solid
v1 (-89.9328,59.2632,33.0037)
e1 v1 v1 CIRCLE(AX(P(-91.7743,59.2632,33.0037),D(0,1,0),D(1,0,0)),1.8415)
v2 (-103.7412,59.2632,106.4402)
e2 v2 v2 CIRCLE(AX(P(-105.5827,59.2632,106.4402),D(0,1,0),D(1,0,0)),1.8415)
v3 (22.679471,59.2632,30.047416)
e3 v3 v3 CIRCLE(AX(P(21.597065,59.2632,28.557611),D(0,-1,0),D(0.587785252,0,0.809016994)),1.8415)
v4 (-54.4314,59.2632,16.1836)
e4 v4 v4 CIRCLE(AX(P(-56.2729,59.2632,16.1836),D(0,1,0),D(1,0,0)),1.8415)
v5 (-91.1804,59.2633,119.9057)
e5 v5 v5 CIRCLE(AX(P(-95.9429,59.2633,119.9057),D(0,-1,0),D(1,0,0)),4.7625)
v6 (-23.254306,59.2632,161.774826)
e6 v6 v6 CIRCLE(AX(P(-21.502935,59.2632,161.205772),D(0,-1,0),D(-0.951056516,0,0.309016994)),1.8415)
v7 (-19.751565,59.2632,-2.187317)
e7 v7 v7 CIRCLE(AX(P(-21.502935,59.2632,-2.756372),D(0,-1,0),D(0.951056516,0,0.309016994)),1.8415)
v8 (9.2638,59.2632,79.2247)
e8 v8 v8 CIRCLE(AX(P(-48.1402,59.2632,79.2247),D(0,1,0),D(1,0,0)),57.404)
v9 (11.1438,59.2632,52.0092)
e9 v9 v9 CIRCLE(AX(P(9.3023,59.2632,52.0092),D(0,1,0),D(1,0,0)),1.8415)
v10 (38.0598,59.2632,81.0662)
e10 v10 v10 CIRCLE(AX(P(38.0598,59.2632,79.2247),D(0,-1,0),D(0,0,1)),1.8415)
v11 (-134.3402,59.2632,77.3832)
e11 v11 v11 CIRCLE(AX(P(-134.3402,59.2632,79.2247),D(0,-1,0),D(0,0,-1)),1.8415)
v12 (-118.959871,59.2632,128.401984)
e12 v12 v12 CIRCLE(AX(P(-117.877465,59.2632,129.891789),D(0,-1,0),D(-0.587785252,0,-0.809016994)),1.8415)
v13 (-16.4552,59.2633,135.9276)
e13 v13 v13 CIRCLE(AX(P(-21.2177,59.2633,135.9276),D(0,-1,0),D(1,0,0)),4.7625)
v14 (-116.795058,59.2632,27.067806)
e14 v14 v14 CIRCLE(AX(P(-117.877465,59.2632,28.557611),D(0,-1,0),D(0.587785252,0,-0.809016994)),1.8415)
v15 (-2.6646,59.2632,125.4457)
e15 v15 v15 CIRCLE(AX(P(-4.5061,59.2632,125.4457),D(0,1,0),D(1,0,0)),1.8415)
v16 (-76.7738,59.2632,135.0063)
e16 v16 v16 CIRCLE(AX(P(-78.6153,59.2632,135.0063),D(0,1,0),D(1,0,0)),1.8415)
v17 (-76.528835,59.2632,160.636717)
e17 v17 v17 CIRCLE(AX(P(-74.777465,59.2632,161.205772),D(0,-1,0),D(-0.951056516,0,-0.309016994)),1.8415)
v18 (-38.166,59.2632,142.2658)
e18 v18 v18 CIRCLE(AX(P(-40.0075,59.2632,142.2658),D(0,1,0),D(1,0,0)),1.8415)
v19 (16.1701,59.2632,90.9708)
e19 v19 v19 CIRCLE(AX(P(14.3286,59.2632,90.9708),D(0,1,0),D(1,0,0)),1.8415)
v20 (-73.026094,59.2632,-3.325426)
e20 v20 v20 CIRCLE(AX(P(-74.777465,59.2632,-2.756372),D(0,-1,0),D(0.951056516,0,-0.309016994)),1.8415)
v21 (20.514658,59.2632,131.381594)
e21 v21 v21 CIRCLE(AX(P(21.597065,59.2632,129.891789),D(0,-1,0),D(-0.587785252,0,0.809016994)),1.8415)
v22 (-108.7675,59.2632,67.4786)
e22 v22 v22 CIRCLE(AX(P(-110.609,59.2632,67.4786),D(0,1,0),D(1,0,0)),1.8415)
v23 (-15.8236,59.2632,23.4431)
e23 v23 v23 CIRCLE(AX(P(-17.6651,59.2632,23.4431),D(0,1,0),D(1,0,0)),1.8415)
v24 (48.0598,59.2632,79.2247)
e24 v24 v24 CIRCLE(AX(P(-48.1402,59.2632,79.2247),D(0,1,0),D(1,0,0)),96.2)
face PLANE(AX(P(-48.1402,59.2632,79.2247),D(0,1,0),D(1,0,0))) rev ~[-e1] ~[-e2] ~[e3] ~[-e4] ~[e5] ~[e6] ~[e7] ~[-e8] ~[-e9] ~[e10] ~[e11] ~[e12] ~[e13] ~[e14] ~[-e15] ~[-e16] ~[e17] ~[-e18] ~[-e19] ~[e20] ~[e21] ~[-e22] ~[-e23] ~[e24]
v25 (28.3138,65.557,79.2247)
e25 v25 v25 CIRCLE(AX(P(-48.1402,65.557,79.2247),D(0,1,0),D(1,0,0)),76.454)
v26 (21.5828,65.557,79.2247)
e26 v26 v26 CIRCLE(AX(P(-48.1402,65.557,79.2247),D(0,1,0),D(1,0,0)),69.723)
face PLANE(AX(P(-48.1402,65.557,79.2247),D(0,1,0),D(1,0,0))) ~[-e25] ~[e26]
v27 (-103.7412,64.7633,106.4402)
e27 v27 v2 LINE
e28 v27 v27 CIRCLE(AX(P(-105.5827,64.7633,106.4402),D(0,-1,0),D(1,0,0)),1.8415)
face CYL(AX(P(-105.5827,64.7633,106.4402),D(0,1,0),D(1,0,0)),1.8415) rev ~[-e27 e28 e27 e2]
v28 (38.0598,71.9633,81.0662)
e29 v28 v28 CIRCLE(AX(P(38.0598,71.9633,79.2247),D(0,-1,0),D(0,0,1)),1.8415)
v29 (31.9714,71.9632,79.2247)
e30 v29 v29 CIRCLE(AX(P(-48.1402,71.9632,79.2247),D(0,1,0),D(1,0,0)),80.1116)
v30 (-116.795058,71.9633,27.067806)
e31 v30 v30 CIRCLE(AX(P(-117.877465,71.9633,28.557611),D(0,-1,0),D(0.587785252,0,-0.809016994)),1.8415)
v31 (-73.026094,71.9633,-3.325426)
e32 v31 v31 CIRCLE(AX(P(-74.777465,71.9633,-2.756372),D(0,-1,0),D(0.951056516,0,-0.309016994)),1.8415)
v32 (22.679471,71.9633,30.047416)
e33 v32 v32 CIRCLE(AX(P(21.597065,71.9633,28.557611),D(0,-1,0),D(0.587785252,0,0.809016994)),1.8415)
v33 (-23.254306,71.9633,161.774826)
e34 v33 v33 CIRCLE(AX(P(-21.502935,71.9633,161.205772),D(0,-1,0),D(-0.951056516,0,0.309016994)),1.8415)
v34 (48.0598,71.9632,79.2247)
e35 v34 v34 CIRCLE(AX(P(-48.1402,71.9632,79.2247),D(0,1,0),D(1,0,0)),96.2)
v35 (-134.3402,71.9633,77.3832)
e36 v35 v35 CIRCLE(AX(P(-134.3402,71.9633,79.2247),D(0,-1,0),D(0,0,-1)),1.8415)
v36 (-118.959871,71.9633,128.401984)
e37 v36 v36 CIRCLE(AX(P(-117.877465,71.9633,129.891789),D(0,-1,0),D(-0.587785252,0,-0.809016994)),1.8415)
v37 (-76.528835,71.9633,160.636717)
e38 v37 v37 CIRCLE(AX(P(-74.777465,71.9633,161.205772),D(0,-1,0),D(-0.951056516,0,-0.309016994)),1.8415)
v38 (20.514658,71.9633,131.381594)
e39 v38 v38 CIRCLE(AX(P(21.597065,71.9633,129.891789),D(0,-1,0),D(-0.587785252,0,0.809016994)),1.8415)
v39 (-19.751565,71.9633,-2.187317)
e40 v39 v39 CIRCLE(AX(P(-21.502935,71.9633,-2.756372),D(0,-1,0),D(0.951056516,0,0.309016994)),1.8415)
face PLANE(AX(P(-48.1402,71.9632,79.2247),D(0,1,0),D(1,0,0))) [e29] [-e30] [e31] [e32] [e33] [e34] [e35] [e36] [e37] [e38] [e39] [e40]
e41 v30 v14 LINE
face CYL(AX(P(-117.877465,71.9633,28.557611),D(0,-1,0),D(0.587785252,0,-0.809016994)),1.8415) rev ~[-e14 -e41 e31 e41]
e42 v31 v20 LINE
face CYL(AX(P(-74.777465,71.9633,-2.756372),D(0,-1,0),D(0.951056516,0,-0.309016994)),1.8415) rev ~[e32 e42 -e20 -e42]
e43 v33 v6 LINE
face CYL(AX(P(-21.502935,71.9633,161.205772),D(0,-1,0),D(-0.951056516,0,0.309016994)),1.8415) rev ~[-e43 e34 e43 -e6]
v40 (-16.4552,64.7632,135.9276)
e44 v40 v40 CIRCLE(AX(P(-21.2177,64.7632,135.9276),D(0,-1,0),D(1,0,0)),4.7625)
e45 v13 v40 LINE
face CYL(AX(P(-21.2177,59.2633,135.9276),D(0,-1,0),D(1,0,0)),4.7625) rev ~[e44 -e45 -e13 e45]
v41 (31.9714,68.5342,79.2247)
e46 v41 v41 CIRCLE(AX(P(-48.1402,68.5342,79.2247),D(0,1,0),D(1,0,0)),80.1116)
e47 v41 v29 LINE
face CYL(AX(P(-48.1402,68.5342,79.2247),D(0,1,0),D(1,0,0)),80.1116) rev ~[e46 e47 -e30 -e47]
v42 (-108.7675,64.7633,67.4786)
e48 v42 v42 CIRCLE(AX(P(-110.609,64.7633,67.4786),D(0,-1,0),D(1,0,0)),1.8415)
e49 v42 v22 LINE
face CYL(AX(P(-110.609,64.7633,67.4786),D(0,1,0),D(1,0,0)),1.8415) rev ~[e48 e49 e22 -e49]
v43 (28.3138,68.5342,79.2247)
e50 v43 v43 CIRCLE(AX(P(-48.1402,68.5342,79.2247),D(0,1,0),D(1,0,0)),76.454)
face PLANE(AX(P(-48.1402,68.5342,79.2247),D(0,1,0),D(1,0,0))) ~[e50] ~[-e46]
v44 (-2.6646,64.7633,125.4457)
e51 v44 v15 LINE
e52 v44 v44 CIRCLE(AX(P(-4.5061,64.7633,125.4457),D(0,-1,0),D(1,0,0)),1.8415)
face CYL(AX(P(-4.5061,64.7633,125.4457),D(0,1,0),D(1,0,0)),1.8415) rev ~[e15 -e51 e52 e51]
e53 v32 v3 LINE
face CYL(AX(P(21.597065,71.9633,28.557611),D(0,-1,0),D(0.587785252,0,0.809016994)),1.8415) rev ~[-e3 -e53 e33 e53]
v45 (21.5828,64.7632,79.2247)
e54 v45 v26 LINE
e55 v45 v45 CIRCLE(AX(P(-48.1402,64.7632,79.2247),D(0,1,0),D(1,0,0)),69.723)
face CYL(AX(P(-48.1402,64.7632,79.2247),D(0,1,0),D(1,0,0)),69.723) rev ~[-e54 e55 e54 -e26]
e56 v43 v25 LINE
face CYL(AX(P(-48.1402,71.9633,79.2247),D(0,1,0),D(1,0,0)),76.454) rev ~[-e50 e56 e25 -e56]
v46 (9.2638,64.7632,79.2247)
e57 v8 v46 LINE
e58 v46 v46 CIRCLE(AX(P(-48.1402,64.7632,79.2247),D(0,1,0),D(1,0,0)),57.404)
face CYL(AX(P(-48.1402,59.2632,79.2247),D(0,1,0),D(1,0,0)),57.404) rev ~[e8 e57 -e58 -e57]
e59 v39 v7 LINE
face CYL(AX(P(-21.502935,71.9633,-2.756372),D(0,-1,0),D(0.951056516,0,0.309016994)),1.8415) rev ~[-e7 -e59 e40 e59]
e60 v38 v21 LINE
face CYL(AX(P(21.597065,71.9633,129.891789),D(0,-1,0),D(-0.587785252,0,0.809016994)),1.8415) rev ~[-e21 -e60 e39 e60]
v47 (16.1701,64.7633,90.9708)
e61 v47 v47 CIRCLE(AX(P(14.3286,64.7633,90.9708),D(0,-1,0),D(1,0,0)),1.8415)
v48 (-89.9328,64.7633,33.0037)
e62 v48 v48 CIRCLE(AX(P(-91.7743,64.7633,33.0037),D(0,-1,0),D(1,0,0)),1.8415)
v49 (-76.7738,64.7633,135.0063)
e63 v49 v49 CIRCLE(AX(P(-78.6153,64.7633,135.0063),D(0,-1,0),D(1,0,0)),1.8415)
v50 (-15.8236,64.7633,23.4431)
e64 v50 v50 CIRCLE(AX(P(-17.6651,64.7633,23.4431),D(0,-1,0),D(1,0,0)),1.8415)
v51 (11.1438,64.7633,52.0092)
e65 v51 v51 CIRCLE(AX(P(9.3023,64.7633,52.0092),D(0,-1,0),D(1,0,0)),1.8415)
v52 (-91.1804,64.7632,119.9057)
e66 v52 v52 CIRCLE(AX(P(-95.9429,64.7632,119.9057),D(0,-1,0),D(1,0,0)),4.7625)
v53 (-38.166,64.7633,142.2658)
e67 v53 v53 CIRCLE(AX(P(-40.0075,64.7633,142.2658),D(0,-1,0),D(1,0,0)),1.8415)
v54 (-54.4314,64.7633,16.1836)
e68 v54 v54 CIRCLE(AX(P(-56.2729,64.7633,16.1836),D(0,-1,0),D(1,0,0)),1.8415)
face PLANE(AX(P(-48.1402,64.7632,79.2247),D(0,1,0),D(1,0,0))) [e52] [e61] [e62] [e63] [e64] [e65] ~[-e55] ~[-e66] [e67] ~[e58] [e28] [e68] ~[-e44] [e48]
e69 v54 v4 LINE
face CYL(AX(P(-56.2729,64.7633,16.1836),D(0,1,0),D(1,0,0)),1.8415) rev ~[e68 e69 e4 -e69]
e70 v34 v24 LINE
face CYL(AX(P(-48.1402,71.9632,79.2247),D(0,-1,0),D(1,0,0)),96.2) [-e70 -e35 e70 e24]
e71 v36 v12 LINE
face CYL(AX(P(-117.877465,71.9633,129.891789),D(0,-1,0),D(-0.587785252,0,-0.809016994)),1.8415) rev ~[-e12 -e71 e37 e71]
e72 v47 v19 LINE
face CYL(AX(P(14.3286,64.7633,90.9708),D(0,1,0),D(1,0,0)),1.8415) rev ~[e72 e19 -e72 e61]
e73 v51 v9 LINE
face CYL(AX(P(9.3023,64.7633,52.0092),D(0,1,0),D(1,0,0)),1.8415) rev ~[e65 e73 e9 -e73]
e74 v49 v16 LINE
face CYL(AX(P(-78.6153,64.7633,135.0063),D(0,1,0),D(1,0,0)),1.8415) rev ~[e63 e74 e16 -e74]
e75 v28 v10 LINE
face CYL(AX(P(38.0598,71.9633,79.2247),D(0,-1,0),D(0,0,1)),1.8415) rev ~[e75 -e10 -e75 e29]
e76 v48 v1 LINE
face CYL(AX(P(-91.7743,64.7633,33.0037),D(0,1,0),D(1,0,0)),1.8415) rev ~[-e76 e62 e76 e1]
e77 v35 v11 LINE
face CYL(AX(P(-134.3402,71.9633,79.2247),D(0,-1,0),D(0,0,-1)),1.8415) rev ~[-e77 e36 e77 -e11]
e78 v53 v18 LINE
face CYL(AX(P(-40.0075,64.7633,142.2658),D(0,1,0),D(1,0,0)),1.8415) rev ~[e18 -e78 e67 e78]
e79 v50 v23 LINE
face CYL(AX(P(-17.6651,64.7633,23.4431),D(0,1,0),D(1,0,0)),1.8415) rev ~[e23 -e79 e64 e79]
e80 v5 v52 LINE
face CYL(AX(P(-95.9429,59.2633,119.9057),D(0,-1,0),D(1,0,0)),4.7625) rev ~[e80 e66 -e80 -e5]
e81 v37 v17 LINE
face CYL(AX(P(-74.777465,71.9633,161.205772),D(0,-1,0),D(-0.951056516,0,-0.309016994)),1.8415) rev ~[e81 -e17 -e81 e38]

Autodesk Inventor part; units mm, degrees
ref_plane "Work Plane1" through (3.7155, 65.557, 54.6036) normal (0, -1, 0) x (0.9033475, 0, -0.4289095)
sketch "Sketch2" plane through (3.7155, 65.557, 54.6036) normal (0, -1, 0) x (0.9033475, 0, -0.4289095)
  circle A0 centre (-118.0349, 16.246) radius 4.7625 projected
  circle A1 centre (-57.404, 62.7698) radius 4.7625 projected
  circle A2 centre (-57.404, 0) radius 69.723 projected
  circle A3 centre (-57.404, 0) radius 57.404 projected
  circle A4 centre (-57.404, 0) radius 76.2 projected
  circle A5 centre (-57.404, 0) radius 84.2
  circle A6 centre (-107.7614, 37.4723) radius 1.0795 projected
  circle A7 centre (-50.1308, 62.3469) radius 1.0795 projected
  circle A8 centre (0.2267, 24.8747) radius 1.0795 projected
  circle A9 centre (-7.0466, -37.4723) radius 1.0795 projected
  circle A10 centre (-64.6772, -62.3469) radius 1.0795 projected
  circle A11 centre (-115.0347, -24.8747) radius 1.0795 projected
  circle A12 centre (-19.0569, -49.9749) radius 1.6475 projected
  circle A13 centre (-95.7511, 49.9749) radius 1.651 projected
  circle A14 centre (-120.1738, 0) radius 4.7625 projected
  circle A15 centre (-41.158, 60.6309) radius 4.7625 projected
  point P0 (20.0636, -50.9196)
  dimension "d0" = 8
extrude "Extrusion1" [suppressed]
ref_plane "Work Plane2" through (-48.1402, 113.182, 79.2247) normal (0, 0, 1) x (1, 0, 0)
sketch "Sketch4" plane through (-48.1402, 113.182, 79.2247) normal (0, 0, 1) x (1, 0, 0)
  line L0 (-76.2, -47.625) -> (76.2, -47.625) construction
  line L1 (0, -48.4188) -> (0, 19.2501)
  line L2 (-57.404, -47.625) -> (57.404, -47.625) construction
  line L3 (57.404, -47.625) -> (57.404, -48.4188)
  line L4 (57.404, -48.4188) -> (69.723, -48.4188)
  line L5 (69.723, -47.625) -> (-69.723, -47.625) construction
  line L6 (69.723, -48.4188) -> (69.723, -47.625)
  line L7 (69.723, -47.625) -> (76.2, -47.625)
  line L8 (76.2, -47.625) -> (76.2, -41.2188) construction
  line L9 (76.2, -41.2188) -> (96.2, -41.2188) construction
  line L10 (96.2, -41.2188) -> (96.2, -53.9188)
  line L11 (96.2, -53.9188) -> (57.404, -53.9188)
  line L12 (57.404, -53.9188) -> (57.404, -48.4188)
  line L13 (76.2, -44.6478) -> (80.1116, -44.6478)
  line L14 (80.1116, -44.6478) -> (80.1116, -41.2188)
  line L15 (80.1116, -41.2188) -> (76.2, -41.2188) construction
  line L16 (76.2, -41.2188) -> (76.2, -44.6478) construction
  line L17 (76.2, -44.6478) -> (76.2, -47.625)
  line L18 (76.2, -41.2188) -> (76.2, -41.2188) construction
  line L19 (96.2, -41.2188) -> (80.1116, -41.2188)
  point P0 (48.1402, -113.182)
  dimension "d4" = 20
  dimension "d9" = 3.9116
  dimension "d10" = 3.429
  dimension "d14" = 12.7
  dimension "d15" = 5.5
  dimension "d32" = 0.7937
revolve "Revolution1" add sketch "Sketch4" angle 360 about axis through (-48.1402, 64.7633, 79.2247) along (0, 1, 0) separate body
sketch "Sketch5" plane through (-48.1402, 59.2633, 79.2247) normal (0, -1, 0) x (1, 0, 0)
  circle A0 centre (0, 0) radius 57.404 projected
  circle A1 centre (26.9225, 56.7029) radius 4.7625 projected
  circle A2 centre (40.681, 47.8027) radius 4.7625 projected
  circle A3 centre (-56.7029, 26.9225) radius 4.7625 projected
  circle A4 centre (-47.8027, 40.681) radius 4.7625 projected
  circle A5 centre (0, 0) radius 69.723 projected
  point P0 (48.1402, -79.2247)
extrude "Extrusion2" cut sketch "Sketch5" against normal through all contours A1 | A4
ref_plane "Work Plane3" through (-48.1402, 113.182, 79.2247) normal (0, 0, 1) x (1, 0, 0)
sketch "Sketch8" plane through (-48.1402, 71.9633, 79.2247) normal (0, 1, 0) x (1, 0, 0)
  circle A0 centre (0, 0) radius 96.2 projected
  line L0 (96.2, 0) -> (76.2, 0)
  circle A1 centre (0, 0) radius 76.2
  point P0 (48.1402, 79.2247)
  point P1 (86.2, 0)
  dimension "d39" = 152.4
hole "Hole1" at (38.0598, 71.9633, 79.2247) direction (0, -1, 0) diameter 3.683 end through all thread size "10-24 UNC" class "2B" standard "ANSI Unified Screw Threads"
pattern_circular "Circular Pattern1" count 10 over 360 about axis through (-48.1402, 65.6133, 79.2247) along (0, -1, 0) of "Hole1"
sketch "Sketch12" plane through (-48.1402, 64.7633, 79.2247) normal (0, -1, 0) x (1, 0, 0)
  circle A0 centre (-62.4688, -11.7461) radius 1.8415 projected
  circle A1 centre (-30.4751, 55.7816) radius 1.8415 projected
  circle A2 centre (62.4688, 11.7461) radius 1.8415 projected
  circle A3 centre (30.4751, -55.7816) radius 1.8415 projected
  circle A4 centre (8.1327, 63.0411) radius 1.8415 projected
  circle A5 centre (-8.1327, -63.0411) radius 1.8415 projected
  circle A6 centre (57.4425, -27.2155) radius 1.8415 projected
  circle A7 centre (43.6341, 46.221) radius 1.8415 projected
  circle A8 centre (-57.4425, 27.2155) radius 1.8415 projected
  circle A9 centre (-43.6341, -46.221) radius 1.8415 projected
  circle A10 centre (0, 0) radius 57.404 projected
  circle A11 centre (0, 0) radius 72.898 projected
  circle A12 centre (26.9225, 56.7029) radius 4.7625 projected
  circle A13 centre (-47.8027, 40.681) radius 4.7625 projected
  circle A14 centre (0, 0) radius 57.404 projected
  circle A15 centre (0, 0) radius 69.723 projected
  point P0 (48.1402, -79.2247)
extrude "Extrusion6" cut sketch "Sketch12" along normal through all contours A0 | A1 | A2 | A3 | A4 | A5 | A6 | A7 | A8 | A9
sketch "Sketch13" plane through (-48.1402, 71.9633, 79.2247) normal (0, 1, 0) x (1, 0, 0)
  circle A0 centre (0, 0) radius 96.2 projected
  circle A1 centre (0, 0) radius 76.454
  point P0 (48.1402, 79.2247)
  dimension "d35" = 152.908
extrude "Extrusion7" cut sketch "Sketch13" against normal up to surface (6.4063 mm away) contours A1
properties part number "1133_RU End Cap"
